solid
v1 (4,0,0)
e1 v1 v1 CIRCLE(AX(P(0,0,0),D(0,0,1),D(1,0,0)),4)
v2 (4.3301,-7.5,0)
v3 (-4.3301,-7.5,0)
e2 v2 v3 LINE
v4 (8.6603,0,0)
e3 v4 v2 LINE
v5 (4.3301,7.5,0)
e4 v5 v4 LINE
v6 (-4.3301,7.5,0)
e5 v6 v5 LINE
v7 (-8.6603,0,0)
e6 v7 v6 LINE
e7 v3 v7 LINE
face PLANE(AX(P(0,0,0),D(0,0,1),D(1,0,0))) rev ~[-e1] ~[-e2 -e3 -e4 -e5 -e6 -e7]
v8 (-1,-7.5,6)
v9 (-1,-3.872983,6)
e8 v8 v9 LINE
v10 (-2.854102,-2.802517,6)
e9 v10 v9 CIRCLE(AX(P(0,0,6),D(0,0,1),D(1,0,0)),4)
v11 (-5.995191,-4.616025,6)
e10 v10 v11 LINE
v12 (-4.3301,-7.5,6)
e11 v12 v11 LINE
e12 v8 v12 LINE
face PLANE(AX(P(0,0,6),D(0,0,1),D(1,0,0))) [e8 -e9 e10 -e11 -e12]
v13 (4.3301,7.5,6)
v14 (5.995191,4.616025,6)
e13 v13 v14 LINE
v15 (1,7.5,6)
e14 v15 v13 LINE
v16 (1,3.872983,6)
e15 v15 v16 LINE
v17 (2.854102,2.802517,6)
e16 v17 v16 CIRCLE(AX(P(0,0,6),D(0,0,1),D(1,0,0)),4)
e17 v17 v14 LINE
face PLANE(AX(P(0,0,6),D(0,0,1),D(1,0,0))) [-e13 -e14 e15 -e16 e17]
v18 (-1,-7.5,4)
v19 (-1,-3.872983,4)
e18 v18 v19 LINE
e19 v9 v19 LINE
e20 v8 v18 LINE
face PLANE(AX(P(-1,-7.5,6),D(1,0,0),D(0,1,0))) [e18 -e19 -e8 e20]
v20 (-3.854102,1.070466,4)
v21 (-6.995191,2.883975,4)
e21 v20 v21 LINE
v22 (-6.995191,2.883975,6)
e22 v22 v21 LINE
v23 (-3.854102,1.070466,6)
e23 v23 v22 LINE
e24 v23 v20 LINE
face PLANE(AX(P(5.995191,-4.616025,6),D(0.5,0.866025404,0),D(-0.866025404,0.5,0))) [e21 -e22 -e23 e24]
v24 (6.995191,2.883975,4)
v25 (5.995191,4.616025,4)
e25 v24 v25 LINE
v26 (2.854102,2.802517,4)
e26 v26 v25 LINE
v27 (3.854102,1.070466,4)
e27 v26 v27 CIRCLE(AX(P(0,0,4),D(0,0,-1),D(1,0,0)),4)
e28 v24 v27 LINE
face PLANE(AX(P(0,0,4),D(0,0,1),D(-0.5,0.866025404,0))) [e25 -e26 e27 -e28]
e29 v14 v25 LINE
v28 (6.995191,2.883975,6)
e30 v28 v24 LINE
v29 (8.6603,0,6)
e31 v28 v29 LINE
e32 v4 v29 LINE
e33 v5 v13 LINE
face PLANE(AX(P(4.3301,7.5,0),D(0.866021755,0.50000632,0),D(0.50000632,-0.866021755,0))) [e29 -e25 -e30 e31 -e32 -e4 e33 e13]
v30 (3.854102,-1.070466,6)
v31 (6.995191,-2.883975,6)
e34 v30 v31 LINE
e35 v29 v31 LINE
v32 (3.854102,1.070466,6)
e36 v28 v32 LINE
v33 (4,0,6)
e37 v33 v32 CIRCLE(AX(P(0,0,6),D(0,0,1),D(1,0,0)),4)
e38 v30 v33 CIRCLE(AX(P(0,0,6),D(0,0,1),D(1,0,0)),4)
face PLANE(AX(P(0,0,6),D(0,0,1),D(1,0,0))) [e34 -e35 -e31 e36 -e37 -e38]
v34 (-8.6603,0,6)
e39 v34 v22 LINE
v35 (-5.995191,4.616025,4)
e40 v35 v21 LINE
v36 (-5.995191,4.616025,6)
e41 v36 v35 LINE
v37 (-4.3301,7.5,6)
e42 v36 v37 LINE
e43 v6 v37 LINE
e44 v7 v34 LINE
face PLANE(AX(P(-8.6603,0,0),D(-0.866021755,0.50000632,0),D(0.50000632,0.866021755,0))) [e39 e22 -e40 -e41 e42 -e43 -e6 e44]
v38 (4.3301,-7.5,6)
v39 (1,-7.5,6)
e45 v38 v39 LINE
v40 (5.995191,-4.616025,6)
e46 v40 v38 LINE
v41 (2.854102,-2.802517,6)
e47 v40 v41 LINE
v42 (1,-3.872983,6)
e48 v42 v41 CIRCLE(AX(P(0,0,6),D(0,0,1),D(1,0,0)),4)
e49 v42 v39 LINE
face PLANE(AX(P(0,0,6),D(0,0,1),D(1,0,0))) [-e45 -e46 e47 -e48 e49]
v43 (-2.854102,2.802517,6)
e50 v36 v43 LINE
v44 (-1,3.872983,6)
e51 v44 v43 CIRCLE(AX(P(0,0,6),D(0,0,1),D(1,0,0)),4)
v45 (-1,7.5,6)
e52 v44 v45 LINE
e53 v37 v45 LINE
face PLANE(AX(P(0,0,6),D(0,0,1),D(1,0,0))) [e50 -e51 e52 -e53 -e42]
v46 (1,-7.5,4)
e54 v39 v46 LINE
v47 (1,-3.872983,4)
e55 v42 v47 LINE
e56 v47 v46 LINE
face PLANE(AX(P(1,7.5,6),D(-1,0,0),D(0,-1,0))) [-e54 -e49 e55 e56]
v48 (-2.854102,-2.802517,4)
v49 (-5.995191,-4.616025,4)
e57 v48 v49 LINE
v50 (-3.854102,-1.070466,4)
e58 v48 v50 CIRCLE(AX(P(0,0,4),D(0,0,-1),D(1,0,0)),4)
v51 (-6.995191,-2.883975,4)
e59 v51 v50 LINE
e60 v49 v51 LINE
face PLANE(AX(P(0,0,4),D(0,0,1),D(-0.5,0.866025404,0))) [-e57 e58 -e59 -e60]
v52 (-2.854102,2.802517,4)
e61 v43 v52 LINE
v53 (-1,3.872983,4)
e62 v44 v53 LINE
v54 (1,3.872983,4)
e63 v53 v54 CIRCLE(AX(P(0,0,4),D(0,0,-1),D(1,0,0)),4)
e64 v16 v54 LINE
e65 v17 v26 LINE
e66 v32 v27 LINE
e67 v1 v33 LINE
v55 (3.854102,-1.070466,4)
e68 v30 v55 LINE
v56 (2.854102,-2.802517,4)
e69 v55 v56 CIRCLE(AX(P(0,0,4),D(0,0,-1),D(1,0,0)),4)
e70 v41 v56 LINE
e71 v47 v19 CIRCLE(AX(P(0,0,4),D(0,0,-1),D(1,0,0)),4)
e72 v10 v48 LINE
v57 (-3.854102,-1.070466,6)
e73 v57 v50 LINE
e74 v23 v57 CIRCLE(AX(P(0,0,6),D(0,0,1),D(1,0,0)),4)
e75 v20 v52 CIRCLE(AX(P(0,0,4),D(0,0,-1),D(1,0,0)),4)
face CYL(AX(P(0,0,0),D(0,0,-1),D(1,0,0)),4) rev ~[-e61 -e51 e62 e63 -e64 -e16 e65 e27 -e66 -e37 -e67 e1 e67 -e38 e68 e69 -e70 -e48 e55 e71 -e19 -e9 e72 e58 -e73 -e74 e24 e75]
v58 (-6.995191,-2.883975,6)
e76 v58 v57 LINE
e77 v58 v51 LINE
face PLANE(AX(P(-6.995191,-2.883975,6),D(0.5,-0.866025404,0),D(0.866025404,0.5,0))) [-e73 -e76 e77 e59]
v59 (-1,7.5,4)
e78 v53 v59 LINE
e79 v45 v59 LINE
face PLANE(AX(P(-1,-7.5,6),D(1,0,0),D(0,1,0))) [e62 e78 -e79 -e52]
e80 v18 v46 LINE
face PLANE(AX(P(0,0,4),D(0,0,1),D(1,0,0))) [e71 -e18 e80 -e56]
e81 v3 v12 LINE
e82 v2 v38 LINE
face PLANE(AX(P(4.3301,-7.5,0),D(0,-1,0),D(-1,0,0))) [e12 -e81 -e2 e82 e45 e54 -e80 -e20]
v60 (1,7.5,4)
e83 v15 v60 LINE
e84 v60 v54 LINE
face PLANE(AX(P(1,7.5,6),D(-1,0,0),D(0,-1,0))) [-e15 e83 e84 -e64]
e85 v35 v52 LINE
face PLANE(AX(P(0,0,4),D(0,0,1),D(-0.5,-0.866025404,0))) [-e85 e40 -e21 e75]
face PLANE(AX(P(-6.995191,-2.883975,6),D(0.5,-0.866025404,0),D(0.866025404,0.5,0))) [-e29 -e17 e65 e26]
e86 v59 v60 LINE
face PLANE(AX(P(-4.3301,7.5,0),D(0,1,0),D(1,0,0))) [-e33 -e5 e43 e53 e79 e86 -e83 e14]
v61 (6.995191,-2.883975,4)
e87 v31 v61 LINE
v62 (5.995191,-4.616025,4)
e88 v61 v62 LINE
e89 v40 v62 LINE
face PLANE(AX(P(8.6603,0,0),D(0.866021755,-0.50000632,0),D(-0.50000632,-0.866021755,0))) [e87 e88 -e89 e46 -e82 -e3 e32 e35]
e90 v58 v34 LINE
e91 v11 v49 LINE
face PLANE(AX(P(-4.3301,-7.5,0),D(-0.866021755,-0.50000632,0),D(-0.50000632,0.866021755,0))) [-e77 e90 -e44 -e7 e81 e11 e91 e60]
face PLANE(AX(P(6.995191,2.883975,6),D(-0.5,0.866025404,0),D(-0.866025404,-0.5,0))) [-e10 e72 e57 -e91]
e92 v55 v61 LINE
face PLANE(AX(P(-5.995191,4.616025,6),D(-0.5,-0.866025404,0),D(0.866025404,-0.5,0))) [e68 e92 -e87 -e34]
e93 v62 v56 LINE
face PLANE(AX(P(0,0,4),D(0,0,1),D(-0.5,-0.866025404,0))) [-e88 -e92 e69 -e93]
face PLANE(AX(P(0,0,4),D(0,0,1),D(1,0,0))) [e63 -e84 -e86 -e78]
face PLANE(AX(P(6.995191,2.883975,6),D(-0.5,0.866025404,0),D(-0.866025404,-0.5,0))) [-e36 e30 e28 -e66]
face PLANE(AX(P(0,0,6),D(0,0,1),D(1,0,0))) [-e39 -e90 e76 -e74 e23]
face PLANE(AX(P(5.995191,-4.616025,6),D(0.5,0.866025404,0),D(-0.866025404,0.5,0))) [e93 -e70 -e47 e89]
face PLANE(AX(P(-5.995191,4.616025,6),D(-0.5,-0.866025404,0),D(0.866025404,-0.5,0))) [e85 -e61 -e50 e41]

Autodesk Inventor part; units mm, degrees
ref_plane "YZ Plane" through (0, 0, 0) normal (1, 0, 0) x (0, 1, 0)
ref_plane "XZ Plane" through (0, 0, 0) normal (0, 1, 0) x (-1, 0, 0)
ref_plane "XY Plane" through (0, 0, 0) normal (0, 0, 1) x (1, 0, 0)
sketch "草图2" plane through (0, 0, 0) normal (0, 0, 1) x (1, 0, 0)
  line L0 (4.3301, -7.5) -> (-4.3301, -7.5)
  line L1 (-4.3301, -7.5) -> (-8.6603, 0)
  line L2 (-8.6603, 0) -> (-4.3301, 7.5)
  line L3 (-4.3301, 7.5) -> (4.3301, 7.5)
  line L4 (4.3301, 7.5) -> (8.6603, 0)
  line L5 (8.6603, 0) -> (4.3301, -7.5)
  line L6 (0, 0) -> (0, 3.4444)
  circle A0 centre (0, 0) radius 4
  point P0 (0, 7.5)
  dimension "d6" = 3.4444
  dimension "d7" = 15
  dimension "d8" = 8
extrude "拉伸2" add sketch "草图2" along normal blind 6
thread "螺纹1" size "M8x1.25" class "6H" standard "ANSI Metric M Profile" full length
sketch "草图3" plane through (0, 0, 6) normal (0, 0, 1) x (1, 0, 0)
  line L0 (-4.3301, -7.5) -> (4.3301, -7.5) projected
  line L1 (-1, 7.5) -> (1, 7.5)
  line L2 (1, 7.5) -> (1, -7.5)
  line L3 (1, -7.5) -> (-1, -7.5)
  line L4 (-1, -7.5) -> (-1, 7.5)
  point P0 (0, 0)
  dimension "d13" = 2
  dimension "d14" = 1
  dimension "d15" = 15
extrude "拉伸3" cut sketch "草图3" against normal blind 2
pattern_circular "环形阵列1" count 3 over 360 about axis through (0, 0, -10) along (0, 0, 1) of "拉伸3"
properties part number "砂轮架固定销螺丝"
